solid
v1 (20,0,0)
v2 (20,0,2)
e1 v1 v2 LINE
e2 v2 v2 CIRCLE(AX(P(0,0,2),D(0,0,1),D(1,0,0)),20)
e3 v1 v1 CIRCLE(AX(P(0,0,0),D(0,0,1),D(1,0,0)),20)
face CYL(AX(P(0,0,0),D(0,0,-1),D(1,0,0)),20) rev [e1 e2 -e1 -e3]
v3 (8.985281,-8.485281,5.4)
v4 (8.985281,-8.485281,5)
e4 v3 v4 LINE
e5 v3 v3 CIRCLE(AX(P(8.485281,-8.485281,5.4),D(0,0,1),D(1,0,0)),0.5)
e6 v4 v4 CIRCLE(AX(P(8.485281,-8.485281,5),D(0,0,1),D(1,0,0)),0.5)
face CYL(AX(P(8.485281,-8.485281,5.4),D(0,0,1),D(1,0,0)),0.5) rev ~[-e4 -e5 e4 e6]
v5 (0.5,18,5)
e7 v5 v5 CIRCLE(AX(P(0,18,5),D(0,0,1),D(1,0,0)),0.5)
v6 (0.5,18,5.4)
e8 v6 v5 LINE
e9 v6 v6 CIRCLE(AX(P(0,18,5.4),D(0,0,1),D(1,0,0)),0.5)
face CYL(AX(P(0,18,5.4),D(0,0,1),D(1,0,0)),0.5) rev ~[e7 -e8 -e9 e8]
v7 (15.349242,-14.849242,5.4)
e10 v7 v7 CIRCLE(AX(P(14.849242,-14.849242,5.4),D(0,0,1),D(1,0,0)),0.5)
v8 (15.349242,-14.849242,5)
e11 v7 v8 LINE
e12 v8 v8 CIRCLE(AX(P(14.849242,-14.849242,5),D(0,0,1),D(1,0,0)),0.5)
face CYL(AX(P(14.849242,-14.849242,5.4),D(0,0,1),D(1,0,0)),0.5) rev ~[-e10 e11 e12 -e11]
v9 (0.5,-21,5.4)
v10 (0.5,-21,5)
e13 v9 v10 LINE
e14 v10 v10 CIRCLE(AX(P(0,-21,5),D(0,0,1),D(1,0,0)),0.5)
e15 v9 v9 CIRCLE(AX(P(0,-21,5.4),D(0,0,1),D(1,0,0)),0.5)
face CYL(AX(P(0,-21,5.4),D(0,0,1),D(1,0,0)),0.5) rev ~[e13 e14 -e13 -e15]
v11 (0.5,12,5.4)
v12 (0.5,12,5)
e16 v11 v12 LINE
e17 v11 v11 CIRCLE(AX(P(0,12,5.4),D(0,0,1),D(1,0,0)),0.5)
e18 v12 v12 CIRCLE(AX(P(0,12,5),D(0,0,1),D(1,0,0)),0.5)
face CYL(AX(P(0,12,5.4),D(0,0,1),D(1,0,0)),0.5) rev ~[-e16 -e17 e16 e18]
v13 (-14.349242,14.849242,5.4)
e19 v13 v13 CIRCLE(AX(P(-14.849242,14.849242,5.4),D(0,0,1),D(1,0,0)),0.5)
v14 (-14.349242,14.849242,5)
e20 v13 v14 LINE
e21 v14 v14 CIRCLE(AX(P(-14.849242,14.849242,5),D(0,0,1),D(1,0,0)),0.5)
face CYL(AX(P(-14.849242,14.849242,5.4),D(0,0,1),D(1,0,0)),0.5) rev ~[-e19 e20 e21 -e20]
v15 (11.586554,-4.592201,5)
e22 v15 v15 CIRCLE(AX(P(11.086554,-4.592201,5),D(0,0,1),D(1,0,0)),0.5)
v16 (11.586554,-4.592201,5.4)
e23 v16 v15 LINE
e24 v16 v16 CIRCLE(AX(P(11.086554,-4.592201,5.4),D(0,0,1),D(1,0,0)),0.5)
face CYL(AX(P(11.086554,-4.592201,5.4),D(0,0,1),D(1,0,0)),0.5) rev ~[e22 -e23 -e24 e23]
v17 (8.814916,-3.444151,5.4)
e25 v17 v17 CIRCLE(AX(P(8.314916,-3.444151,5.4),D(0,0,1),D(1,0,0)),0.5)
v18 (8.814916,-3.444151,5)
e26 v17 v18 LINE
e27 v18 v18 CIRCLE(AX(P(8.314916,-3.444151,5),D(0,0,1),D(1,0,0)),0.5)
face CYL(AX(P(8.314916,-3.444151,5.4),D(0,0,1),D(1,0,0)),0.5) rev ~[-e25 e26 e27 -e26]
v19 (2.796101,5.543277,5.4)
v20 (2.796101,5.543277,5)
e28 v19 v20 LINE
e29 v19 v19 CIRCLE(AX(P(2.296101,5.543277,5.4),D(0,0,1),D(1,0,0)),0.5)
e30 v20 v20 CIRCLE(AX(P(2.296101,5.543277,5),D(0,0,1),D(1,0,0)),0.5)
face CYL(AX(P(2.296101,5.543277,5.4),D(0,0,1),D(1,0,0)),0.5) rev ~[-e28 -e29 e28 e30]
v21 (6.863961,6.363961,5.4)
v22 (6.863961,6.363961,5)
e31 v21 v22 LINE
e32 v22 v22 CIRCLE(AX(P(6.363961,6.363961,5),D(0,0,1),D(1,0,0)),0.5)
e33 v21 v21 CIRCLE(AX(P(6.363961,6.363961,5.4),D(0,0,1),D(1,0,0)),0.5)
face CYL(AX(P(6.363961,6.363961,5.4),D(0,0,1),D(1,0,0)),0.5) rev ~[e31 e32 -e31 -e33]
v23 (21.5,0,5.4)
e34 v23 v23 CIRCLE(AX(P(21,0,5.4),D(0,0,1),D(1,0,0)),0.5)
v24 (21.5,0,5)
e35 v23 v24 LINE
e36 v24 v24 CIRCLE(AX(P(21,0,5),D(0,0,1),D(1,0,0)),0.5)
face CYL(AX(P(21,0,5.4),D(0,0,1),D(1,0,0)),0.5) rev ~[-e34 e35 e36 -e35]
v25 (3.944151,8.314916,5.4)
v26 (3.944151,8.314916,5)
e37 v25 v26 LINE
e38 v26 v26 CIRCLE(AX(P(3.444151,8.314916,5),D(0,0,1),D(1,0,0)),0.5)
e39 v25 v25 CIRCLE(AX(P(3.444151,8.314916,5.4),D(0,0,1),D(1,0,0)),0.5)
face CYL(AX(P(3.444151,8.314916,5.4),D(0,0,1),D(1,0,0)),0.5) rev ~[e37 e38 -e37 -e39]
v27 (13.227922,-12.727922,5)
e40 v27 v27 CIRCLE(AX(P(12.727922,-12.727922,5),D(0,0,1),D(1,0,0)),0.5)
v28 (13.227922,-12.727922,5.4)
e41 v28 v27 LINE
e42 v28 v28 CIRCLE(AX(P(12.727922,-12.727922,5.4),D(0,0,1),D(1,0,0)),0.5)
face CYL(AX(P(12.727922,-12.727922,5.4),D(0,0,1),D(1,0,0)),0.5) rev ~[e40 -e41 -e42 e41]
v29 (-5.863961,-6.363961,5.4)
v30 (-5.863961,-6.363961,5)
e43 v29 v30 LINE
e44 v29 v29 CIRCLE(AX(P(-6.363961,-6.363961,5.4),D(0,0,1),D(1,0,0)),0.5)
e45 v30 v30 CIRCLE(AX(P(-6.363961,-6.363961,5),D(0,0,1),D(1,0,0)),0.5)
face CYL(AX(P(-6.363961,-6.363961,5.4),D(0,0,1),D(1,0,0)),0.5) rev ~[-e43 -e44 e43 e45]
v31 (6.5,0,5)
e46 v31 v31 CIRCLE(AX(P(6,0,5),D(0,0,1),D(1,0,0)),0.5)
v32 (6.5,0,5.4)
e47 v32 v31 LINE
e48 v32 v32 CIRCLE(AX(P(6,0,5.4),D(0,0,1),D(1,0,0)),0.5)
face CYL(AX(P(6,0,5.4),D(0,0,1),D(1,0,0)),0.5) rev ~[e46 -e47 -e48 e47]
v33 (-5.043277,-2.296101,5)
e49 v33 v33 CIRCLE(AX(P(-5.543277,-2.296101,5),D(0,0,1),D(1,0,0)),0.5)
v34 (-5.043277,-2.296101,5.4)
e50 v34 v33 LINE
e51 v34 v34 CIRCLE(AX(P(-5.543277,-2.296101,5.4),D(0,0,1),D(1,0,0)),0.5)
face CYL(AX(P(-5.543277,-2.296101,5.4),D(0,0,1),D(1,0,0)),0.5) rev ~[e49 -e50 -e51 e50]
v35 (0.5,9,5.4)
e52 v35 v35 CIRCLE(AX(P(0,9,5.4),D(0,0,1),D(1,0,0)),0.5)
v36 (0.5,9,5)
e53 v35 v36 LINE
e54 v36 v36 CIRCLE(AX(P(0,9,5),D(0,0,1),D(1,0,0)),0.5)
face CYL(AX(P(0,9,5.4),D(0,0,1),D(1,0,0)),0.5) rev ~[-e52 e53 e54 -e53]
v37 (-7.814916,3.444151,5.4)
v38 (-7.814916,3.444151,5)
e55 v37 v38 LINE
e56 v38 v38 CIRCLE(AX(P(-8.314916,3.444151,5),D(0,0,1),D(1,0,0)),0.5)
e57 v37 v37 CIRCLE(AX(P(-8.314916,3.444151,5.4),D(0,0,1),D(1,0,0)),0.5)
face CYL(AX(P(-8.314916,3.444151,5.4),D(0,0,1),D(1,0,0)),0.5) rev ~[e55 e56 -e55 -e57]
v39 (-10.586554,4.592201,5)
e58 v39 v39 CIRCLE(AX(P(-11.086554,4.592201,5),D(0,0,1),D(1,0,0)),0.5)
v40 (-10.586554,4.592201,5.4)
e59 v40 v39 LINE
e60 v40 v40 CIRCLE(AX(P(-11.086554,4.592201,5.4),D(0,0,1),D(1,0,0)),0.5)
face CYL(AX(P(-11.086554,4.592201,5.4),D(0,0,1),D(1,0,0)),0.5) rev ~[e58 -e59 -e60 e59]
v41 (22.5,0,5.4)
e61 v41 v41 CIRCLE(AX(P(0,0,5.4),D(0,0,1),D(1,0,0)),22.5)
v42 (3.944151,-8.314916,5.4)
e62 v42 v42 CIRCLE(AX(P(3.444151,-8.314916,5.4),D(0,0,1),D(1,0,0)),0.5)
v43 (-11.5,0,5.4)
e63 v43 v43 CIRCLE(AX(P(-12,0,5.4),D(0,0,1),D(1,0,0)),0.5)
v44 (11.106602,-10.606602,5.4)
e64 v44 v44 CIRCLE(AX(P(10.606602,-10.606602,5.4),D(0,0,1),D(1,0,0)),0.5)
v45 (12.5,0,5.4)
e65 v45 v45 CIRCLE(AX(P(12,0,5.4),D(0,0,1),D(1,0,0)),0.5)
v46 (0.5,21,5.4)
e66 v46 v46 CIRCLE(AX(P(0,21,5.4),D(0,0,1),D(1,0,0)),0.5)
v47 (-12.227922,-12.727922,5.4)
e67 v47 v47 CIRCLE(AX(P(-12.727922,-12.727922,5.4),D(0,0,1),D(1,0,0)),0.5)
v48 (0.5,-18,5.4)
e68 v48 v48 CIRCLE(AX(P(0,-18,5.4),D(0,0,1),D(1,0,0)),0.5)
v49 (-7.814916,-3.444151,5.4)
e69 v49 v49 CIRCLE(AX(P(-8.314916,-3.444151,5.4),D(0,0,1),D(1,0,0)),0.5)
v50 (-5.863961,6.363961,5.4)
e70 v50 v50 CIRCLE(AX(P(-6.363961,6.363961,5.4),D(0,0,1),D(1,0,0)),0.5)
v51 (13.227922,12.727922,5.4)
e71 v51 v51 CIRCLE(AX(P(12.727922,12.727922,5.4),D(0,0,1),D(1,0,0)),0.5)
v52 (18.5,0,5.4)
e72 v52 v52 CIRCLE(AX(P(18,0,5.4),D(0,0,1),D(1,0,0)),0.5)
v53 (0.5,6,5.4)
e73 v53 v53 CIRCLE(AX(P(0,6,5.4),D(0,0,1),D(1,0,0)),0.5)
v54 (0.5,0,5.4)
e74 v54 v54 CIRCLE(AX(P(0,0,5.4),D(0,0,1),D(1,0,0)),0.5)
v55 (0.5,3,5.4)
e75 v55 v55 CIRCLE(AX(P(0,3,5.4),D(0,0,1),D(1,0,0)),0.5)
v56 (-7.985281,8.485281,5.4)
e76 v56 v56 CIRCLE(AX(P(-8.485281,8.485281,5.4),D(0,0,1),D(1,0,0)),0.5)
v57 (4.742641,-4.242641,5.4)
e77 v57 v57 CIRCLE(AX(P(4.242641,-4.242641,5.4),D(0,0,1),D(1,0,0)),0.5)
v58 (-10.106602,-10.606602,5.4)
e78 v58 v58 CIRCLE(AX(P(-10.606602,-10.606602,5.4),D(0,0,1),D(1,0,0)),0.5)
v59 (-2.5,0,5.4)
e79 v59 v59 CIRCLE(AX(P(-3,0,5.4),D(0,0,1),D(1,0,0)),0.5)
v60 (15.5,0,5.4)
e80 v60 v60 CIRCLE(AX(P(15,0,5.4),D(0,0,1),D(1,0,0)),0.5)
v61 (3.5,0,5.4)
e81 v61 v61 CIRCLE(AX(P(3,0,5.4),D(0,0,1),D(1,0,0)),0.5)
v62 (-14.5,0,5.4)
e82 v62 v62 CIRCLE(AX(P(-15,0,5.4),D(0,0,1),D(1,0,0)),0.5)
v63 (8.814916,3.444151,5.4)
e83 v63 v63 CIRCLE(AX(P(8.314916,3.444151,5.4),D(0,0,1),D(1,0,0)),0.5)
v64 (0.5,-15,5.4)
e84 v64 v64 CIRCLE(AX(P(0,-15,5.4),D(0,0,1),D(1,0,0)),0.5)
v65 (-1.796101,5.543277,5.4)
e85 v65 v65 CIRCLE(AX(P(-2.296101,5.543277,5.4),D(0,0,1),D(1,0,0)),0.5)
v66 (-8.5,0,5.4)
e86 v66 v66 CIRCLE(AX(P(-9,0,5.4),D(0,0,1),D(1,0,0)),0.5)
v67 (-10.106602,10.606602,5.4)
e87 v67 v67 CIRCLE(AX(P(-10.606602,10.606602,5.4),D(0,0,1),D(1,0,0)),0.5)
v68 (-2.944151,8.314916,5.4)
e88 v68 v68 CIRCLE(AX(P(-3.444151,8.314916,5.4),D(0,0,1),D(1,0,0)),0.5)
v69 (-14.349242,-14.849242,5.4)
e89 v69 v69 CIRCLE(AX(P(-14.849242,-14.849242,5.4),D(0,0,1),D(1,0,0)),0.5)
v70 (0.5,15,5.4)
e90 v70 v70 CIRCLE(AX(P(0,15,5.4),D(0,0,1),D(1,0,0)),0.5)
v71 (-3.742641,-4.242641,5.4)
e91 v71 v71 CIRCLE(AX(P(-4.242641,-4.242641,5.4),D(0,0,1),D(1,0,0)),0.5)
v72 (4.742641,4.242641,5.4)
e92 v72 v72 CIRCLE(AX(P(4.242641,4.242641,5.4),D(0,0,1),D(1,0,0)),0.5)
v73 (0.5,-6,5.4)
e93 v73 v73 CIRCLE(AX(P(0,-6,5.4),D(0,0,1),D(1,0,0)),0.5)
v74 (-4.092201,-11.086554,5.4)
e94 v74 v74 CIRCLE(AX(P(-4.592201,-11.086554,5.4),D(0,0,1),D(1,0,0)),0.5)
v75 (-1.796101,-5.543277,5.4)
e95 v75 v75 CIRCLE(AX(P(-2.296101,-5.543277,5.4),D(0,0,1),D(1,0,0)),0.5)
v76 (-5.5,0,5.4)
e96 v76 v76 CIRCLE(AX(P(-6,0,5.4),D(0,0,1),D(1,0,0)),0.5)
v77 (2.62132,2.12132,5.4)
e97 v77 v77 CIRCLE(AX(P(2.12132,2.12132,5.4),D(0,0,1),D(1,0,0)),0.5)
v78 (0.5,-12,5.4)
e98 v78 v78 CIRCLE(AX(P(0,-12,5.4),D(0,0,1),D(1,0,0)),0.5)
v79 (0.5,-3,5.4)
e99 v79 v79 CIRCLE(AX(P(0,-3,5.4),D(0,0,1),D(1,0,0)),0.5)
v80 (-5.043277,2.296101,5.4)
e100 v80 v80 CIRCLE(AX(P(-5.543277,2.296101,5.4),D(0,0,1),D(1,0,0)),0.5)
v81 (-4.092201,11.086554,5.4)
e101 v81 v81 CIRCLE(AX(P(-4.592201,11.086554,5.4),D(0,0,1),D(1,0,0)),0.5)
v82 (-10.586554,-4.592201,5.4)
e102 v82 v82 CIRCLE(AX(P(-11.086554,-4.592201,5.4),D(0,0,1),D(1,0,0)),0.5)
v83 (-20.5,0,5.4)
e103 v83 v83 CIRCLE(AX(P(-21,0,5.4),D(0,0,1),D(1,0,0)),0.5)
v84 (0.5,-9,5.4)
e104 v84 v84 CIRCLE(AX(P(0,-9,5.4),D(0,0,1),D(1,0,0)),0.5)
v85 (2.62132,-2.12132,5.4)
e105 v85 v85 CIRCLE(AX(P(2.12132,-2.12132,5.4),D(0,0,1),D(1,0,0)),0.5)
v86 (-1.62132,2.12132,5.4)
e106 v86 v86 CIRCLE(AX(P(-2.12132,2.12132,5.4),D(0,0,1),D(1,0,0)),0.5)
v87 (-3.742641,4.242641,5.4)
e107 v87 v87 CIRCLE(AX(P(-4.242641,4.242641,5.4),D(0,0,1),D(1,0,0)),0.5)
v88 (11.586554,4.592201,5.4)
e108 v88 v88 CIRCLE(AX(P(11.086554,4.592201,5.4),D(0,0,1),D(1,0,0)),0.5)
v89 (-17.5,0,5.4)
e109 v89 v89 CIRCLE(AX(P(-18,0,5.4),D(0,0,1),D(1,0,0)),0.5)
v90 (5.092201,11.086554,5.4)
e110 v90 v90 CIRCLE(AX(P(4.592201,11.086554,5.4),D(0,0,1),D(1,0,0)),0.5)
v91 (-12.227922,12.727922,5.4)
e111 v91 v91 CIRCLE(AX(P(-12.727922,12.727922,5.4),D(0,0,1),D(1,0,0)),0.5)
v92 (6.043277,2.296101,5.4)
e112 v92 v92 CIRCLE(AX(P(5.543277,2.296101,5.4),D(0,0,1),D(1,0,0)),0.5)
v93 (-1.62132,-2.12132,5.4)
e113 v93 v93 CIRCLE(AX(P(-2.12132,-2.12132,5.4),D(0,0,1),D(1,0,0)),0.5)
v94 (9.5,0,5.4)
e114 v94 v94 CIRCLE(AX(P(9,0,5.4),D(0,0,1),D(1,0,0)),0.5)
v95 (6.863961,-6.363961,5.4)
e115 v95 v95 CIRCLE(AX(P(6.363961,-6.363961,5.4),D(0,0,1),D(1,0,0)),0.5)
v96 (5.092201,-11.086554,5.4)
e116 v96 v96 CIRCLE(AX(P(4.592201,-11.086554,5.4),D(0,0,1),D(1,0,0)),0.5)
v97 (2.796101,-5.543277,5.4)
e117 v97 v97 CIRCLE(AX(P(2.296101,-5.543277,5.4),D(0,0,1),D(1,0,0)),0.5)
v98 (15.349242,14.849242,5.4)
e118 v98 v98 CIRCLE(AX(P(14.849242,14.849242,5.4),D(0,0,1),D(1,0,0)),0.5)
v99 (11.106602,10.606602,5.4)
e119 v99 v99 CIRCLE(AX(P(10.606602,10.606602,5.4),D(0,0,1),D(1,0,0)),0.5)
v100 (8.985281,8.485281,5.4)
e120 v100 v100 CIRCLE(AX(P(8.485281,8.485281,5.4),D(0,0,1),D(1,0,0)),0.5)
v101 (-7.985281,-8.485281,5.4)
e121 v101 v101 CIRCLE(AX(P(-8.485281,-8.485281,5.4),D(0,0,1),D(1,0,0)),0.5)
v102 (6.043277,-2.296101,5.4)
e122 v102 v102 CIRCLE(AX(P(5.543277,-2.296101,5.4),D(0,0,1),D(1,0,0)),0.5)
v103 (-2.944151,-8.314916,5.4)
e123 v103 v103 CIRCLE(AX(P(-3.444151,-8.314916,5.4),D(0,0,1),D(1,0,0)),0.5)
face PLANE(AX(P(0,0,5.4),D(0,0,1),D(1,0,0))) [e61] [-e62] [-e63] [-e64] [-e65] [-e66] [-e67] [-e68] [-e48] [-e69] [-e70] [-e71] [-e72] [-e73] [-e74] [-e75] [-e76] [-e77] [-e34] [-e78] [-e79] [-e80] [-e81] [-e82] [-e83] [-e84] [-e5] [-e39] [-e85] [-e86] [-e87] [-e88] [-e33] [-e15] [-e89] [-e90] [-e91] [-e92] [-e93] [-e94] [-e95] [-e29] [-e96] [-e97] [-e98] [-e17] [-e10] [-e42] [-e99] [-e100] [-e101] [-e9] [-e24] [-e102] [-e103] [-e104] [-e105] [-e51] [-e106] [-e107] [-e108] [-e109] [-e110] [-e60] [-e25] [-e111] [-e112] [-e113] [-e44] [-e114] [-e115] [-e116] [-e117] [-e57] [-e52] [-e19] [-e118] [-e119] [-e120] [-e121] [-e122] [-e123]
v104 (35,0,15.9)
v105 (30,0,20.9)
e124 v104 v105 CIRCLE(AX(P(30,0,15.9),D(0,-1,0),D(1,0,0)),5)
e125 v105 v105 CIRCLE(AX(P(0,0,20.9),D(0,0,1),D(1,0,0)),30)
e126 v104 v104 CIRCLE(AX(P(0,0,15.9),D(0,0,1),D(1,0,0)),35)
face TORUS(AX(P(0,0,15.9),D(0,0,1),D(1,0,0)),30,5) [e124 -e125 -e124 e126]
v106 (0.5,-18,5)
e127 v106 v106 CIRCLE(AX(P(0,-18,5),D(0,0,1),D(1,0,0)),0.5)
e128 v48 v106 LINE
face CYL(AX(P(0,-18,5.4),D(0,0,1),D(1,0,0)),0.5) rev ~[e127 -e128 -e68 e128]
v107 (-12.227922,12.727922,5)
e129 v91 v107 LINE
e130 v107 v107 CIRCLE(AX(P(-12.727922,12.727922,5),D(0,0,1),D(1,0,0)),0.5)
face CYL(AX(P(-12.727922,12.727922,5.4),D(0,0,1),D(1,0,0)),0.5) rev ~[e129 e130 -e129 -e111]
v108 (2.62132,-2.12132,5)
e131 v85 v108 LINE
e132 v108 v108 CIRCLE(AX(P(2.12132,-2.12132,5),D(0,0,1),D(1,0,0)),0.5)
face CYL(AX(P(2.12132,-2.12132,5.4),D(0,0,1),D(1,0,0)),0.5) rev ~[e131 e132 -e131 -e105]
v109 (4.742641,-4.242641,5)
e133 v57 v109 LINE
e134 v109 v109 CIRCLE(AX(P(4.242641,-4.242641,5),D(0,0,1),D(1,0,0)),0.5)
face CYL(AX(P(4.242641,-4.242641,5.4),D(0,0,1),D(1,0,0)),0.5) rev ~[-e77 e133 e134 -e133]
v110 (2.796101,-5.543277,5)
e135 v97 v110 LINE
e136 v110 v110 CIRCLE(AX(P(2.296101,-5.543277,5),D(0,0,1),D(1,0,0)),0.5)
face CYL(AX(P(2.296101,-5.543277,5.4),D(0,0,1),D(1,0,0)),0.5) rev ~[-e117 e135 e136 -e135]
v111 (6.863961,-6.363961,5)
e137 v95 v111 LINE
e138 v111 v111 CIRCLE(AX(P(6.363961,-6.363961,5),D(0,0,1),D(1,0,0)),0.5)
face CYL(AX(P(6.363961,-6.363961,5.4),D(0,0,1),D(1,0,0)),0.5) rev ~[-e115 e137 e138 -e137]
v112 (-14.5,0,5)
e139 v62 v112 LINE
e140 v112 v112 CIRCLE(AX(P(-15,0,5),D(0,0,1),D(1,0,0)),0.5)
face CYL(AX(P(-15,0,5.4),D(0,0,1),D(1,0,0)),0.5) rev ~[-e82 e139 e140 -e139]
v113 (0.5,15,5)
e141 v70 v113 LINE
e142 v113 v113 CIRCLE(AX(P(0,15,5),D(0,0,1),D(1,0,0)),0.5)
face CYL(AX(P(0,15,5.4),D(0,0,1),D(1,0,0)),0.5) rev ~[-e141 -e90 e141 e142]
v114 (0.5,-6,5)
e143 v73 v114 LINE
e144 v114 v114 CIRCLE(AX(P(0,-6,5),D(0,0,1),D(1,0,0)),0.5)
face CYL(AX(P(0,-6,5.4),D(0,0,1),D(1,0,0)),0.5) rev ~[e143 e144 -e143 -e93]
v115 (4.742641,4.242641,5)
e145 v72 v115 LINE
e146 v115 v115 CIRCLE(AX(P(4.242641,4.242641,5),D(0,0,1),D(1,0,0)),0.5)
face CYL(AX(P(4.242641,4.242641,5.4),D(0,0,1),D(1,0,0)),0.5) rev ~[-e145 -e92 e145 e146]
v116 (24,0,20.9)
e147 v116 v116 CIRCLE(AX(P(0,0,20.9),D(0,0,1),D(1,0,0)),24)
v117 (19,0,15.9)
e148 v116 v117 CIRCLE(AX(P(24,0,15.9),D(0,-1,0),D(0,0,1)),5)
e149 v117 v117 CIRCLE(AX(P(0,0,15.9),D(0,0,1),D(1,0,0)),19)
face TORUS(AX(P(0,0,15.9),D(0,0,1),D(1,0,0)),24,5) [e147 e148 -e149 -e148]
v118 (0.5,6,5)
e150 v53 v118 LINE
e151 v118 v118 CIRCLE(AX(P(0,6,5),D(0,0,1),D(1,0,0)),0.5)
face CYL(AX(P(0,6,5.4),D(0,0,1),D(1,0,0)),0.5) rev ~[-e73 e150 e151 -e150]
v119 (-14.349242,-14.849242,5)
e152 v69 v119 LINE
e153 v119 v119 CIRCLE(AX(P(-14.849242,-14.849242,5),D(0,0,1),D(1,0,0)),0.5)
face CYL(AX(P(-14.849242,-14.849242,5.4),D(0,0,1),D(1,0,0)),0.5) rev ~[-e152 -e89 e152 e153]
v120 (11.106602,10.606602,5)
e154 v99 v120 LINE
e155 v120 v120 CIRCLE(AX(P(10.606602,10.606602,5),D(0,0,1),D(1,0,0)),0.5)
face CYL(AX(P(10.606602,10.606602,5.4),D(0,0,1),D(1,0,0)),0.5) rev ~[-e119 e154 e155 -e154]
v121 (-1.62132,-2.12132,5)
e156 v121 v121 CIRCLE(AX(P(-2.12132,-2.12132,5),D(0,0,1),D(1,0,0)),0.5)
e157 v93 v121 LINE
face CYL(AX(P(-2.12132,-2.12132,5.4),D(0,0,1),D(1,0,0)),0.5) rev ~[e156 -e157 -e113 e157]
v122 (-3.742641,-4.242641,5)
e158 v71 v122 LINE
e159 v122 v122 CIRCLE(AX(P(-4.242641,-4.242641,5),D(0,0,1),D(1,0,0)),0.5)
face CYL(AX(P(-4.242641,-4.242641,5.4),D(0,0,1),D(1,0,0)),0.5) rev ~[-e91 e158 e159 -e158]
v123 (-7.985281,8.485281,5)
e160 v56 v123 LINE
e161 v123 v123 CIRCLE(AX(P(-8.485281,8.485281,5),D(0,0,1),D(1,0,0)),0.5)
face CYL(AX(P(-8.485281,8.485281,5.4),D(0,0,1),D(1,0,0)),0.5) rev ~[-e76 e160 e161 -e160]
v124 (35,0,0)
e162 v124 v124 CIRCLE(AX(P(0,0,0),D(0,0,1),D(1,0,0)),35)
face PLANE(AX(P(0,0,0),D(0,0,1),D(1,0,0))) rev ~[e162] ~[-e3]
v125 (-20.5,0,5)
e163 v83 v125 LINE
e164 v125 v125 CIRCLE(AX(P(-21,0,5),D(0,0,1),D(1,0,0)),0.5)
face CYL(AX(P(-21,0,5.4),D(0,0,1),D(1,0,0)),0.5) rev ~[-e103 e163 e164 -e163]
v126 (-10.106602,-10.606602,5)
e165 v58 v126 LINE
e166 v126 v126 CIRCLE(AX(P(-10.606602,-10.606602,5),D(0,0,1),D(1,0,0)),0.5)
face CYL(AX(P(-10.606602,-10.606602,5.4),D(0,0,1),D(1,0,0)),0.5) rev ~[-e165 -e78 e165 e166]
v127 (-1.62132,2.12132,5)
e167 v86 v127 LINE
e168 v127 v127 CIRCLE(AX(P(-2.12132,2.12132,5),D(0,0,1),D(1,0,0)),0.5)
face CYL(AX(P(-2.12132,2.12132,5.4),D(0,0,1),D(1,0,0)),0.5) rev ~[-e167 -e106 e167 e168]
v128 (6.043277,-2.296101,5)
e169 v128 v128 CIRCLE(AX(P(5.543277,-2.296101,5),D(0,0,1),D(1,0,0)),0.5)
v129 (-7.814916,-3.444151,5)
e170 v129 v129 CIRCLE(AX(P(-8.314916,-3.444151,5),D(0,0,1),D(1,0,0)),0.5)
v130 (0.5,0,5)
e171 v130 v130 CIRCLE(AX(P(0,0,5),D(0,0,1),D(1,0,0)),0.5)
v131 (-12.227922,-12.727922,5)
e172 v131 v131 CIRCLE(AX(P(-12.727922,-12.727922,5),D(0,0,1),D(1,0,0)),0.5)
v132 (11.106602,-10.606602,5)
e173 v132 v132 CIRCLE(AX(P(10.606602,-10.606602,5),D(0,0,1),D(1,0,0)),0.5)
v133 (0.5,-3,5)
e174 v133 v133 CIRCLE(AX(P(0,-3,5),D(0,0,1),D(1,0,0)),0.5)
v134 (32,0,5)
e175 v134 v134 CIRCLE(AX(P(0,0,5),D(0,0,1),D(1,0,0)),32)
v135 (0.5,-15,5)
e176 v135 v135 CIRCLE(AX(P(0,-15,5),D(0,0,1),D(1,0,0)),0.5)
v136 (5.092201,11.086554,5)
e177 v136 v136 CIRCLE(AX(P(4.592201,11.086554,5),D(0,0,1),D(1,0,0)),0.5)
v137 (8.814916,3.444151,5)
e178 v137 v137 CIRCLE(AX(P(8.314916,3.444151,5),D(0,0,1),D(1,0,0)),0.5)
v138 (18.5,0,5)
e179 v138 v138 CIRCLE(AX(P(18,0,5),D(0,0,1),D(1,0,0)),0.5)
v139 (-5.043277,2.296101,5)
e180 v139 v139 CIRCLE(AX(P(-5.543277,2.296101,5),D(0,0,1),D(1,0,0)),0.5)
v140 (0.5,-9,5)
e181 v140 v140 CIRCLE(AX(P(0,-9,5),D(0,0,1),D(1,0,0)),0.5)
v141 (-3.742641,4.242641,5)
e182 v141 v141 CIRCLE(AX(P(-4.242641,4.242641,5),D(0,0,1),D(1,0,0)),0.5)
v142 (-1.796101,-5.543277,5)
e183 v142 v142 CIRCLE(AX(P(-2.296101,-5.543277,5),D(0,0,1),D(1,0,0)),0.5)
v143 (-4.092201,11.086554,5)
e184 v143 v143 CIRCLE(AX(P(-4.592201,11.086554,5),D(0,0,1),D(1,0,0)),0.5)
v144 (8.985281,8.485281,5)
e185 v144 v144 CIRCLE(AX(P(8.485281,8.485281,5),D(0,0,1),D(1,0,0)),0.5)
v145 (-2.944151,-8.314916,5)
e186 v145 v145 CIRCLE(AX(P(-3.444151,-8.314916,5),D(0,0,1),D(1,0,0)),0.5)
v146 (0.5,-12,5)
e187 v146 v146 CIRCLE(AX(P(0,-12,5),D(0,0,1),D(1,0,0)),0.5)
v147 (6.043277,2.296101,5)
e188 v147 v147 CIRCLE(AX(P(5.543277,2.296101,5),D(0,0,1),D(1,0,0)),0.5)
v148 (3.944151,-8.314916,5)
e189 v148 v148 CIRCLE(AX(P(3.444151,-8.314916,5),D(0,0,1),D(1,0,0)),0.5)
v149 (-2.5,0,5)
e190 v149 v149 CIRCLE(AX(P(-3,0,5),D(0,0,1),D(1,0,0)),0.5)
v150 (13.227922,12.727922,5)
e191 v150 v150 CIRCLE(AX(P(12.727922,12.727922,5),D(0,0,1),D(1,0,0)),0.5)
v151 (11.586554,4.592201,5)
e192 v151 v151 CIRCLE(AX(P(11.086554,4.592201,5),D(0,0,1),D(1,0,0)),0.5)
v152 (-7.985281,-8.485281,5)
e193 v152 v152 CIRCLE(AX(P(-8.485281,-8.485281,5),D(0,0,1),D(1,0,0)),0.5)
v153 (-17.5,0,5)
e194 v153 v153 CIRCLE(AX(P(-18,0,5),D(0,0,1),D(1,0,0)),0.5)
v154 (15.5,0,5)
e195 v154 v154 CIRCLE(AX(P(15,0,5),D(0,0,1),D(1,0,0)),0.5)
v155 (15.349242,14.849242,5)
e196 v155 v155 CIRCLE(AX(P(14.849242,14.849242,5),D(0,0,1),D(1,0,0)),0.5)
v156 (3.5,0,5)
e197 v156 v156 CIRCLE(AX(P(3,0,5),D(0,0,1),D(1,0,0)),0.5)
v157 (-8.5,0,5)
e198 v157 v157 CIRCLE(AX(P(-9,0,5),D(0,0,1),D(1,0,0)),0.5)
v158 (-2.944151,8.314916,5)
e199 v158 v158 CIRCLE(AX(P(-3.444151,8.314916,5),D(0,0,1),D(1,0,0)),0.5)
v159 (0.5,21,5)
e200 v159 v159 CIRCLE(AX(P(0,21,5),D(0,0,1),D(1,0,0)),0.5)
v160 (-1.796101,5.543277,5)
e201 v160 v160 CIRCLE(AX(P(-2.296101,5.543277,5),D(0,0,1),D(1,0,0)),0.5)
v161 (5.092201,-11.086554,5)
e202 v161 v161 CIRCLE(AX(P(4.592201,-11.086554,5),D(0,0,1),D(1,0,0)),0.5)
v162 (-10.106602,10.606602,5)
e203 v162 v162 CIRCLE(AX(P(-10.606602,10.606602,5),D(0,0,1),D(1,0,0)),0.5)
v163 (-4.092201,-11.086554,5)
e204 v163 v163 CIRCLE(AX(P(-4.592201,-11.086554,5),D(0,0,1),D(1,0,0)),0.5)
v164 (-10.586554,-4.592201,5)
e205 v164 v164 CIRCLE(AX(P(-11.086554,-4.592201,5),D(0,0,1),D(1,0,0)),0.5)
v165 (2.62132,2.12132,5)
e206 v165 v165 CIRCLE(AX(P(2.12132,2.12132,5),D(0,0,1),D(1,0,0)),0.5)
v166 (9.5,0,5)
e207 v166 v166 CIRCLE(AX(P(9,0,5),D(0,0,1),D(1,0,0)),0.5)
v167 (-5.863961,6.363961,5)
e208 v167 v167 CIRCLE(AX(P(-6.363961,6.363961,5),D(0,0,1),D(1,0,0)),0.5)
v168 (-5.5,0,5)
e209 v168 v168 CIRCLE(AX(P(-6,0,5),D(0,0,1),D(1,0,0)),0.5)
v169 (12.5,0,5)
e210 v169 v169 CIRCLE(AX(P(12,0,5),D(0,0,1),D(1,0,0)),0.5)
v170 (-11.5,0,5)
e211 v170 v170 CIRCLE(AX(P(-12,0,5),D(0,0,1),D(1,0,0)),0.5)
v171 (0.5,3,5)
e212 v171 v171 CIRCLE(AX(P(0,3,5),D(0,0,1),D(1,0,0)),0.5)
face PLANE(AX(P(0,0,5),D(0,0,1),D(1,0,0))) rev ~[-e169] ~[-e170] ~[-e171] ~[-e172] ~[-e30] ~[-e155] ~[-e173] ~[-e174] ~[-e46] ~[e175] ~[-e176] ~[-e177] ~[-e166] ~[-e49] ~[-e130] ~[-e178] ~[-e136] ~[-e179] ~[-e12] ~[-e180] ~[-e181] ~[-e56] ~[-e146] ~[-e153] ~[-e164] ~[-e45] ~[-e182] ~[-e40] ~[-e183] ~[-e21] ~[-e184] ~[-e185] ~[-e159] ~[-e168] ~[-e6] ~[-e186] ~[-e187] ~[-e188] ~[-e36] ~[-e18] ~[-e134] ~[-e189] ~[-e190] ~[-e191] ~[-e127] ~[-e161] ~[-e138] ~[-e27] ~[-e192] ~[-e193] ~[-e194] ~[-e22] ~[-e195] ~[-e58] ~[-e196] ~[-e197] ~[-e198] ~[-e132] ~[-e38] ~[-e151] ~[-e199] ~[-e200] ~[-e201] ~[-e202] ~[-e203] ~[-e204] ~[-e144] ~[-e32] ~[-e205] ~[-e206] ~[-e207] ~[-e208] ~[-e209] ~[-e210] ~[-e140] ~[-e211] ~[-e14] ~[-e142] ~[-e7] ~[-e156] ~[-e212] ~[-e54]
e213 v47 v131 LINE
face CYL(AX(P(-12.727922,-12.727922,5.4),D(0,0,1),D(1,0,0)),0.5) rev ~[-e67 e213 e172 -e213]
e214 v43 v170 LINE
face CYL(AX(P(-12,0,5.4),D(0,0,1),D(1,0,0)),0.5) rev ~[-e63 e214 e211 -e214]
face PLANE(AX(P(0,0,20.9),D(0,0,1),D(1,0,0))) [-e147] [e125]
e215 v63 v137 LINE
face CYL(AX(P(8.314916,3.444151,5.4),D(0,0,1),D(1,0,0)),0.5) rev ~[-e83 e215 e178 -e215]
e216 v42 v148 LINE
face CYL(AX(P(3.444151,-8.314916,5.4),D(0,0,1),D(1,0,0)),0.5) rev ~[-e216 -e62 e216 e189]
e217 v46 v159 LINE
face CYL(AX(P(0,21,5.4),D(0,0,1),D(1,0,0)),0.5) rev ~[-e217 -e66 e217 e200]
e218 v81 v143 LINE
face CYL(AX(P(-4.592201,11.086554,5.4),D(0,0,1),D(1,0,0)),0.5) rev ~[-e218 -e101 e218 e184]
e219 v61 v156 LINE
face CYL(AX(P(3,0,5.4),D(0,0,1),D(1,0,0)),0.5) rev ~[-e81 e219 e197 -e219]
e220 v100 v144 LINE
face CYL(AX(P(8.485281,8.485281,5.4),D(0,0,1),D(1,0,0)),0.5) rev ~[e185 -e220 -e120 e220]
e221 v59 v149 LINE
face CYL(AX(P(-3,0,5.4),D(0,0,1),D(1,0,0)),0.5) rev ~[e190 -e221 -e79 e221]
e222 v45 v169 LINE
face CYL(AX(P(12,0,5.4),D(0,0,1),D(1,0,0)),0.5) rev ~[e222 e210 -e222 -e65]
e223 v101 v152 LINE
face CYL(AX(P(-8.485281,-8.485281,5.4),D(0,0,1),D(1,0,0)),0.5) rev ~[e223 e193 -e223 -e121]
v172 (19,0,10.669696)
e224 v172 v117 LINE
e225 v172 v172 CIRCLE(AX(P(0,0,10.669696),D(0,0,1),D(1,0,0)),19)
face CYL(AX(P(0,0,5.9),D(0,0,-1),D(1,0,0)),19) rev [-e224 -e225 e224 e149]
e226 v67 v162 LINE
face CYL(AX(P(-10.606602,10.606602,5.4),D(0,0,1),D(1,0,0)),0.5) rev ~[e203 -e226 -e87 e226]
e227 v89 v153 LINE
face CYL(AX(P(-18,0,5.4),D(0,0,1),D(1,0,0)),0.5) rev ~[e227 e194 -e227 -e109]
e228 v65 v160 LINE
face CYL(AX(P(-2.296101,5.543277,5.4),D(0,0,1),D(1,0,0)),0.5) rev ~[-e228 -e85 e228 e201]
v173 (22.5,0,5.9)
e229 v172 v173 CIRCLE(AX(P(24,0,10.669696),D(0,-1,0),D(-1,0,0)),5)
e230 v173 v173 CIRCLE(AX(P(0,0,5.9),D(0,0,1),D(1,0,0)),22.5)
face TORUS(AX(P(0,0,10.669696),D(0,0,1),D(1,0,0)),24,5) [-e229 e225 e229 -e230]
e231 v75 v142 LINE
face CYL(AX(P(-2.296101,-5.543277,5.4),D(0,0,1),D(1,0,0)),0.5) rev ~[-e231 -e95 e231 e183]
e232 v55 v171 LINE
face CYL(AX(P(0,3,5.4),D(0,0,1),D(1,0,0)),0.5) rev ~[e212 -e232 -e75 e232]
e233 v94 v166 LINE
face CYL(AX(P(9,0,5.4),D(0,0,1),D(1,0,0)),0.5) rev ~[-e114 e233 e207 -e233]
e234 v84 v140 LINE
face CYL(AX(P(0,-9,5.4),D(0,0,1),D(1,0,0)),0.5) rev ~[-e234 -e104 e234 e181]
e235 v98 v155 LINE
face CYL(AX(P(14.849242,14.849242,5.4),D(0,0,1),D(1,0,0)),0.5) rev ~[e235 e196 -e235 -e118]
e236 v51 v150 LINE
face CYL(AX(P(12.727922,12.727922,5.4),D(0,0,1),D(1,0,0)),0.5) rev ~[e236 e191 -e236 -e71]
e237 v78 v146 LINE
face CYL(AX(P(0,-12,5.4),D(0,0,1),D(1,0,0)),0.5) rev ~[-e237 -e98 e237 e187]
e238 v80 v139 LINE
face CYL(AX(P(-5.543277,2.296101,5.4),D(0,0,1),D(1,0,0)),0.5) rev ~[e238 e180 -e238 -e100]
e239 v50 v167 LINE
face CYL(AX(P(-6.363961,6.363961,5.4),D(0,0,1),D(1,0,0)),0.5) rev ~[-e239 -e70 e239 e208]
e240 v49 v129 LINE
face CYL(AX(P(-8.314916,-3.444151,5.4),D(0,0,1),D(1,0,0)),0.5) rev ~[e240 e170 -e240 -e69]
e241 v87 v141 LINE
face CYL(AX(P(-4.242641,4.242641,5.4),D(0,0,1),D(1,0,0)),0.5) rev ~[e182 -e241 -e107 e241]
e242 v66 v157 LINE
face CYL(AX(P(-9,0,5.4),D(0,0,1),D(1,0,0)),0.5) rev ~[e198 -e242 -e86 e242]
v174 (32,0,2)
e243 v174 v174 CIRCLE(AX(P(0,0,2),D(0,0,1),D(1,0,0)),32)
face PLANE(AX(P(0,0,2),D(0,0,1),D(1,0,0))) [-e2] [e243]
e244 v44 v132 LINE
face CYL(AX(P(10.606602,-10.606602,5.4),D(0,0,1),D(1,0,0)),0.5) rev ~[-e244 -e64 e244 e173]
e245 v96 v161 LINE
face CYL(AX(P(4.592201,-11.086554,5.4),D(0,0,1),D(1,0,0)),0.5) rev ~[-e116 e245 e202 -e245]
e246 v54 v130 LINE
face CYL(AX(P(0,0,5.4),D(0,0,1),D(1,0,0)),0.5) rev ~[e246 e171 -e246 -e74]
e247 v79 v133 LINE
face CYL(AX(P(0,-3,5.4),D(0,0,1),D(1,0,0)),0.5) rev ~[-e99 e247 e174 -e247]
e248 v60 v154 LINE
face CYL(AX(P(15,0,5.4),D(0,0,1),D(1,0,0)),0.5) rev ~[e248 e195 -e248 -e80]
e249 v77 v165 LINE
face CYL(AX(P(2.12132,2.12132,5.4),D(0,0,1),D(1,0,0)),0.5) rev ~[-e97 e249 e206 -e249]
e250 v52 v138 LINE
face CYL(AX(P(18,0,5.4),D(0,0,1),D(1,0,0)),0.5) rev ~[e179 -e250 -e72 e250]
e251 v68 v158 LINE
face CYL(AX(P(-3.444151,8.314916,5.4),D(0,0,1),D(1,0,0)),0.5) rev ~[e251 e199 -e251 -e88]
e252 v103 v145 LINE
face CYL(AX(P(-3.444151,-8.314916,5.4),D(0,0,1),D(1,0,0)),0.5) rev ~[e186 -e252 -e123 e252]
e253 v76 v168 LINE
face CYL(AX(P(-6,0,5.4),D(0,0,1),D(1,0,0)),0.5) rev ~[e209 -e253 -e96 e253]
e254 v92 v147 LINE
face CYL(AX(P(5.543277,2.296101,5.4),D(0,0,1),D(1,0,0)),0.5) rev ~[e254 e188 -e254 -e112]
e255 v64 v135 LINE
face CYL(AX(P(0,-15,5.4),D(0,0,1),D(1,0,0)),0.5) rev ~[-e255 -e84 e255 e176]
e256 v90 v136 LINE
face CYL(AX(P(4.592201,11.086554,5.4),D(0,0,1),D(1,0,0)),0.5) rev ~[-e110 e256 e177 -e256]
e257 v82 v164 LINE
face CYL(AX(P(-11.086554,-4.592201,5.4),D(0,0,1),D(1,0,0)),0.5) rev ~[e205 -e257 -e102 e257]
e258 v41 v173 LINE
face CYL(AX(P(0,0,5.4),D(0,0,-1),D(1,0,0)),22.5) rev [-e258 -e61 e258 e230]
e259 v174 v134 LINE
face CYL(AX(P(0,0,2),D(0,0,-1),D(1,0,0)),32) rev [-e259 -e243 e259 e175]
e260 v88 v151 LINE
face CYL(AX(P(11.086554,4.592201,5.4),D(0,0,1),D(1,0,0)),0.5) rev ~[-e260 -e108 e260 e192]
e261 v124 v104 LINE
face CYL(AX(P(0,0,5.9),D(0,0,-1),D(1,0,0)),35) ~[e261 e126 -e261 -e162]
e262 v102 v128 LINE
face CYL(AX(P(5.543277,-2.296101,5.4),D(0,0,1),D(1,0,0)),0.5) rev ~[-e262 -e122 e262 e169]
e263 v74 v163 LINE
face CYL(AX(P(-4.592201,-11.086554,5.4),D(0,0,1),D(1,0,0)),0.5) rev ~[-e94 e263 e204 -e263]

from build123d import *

# Parameters (mm, degrees)
F0_R      = 35
F0_R_2    = 20
F1_DEPTH  = 2
F2_R      = 35
F2_R_2    = 32
F3_DEPTH  = 3
F4_R      = 35
F5_DEPTH  = 0.4
F6_R      = 0.5
F7_DEPTH  = 1
F8_R      = 35
F8_R_2    = 22.5
F9_DEPTH  = 0.5
F10_R     = 35
F10_R_2   = 22.5
F10_R_3   = 19
F11_DEPTH = 15


# Not quite as in the source:
# - a fillet or chamfer that OpenCascade refuses, or shapes differently, is made with other operations: its cross-section is extruded or revolved along the edge and cut away or added


with BuildPart() as f1:
    # F0 (on Top) → F1 (new body)
    with BuildSketch(Plane.XY):
        Circle(F0_R)
        Circle(F0_R_2, mode=Mode.SUBTRACT)
    extrude(amount=F1_DEPTH)

    # F2 (on face) → F3 (join)
    with BuildSketch(Plane.XY.offset(2)):
        Circle(F2_R)
        Circle(F2_R_2, mode=Mode.SUBTRACT)
    extrude(amount=F3_DEPTH)

    # F4 (on face) → F5 (join)
    with BuildSketch(Plane.XY.offset(5)):
        Circle(F4_R)
    extrude(amount=F5_DEPTH)

    # F6 (on face) → F7 (cut)
    with BuildSketch(Plane.XY.offset(5.4)):
        Circle(F6_R)
        with Locations((3, 0)):
            Circle(F6_R)
        with Locations((6, 0)):
            Circle(F6_R)
        with Locations((9, 0)):
            Circle(F6_R)
        with Locations((12, 0)):
            Circle(F6_R)
        with Locations((15, 0)):
            Circle(F6_R)
        with Locations((18, 0)):
            Circle(F6_R)
        with Locations((21, 0)):
            Circle(F6_R)
        with Locations((2.1213203436, 2.1213203436)):
            Circle(F6_R)
        with Locations((4.2426406871, 4.2426406871)):
            Circle(F6_R)
        with Locations((6.3639610307, 6.3639610307)):
            Circle(F6_R)
        with Locations((8.4852813742, 8.4852813742)):
            Circle(F6_R)
        with Locations((10.6066017178, 10.6066017178)):
            Circle(F6_R)
        with Locations((12.7279220614, 12.7279220614)):
            Circle(F6_R)
        with Locations((14.8492424049, 14.8492424049)):
            Circle(F6_R)
        with Locations((0, 3)):
            Circle(F6_R)
        with Locations((0, 6)):
            Circle(F6_R)
        with Locations((0, 9)):
            Circle(F6_R)
        with Locations((0, 12)):
            Circle(F6_R)
        with Locations((0, 15)):
            Circle(F6_R)
        with Locations((0, 18)):
            Circle(F6_R)
        with Locations((0, 21)):
            Circle(F6_R)
        with Locations((-2.1213203436, 2.1213203436)):
            Circle(F6_R)
        with Locations((-4.2426406871, 4.2426406871)):
            Circle(F6_R)
        with Locations((-6.3639610307, 6.3639610307)):
            Circle(F6_R)
        with Locations((-8.4852813742, 8.4852813742)):
            Circle(F6_R)
        with Locations((-10.6066017178, 10.6066017178)):
            Circle(F6_R)
        with Locations((-12.7279220614, 12.7279220614)):
            Circle(F6_R)
        with Locations((-14.8492424049, 14.8492424049)):
            Circle(F6_R)
        with Locations((-3, 0)):
            Circle(F6_R)
        with Locations((-6, 0)):
            Circle(F6_R)
        with Locations((-9, 0)):
            Circle(F6_R)
        with Locations((-12, 0)):
            Circle(F6_R)
        with Locations((-15, 0)):
            Circle(F6_R)
        with Locations((-18, 0)):
            Circle(F6_R)
        with Locations((-21, 0)):
            Circle(F6_R)
        with Locations((-2.1213203436, -2.1213203436)):
            Circle(F6_R)
        with Locations((-4.2426406871, -4.2426406871)):
            Circle(F6_R)
        with Locations((-6.3639610307, -6.3639610307)):
            Circle(F6_R)
        with Locations((-8.4852813742, -8.4852813742)):
            Circle(F6_R)
        with Locations((-10.6066017178, -10.6066017178)):
            Circle(F6_R)
        with Locations((-12.7279220614, -12.7279220614)):
            Circle(F6_R)
        with Locations((-14.8492424049, -14.8492424049)):
            Circle(F6_R)
        with Locations((0, -3)):
            Circle(F6_R)
        with Locations((0, -6)):
            Circle(F6_R)
        with Locations((0, -9)):
            Circle(F6_R)
        with Locations((0, -12)):
            Circle(F6_R)
        with Locations((0, -15)):
            Circle(F6_R)
        with Locations((0, -18)):
            Circle(F6_R)
        with Locations((0, -21)):
            Circle(F6_R)
        with Locations((2.1213203436, -2.1213203436)):
            Circle(F6_R)
        with Locations((4.2426406871, -4.2426406871)):
            Circle(F6_R)
        with Locations((6.3639610307, -6.3639610307)):
            Circle(F6_R)
        with Locations((8.4852813742, -8.4852813742)):
            Circle(F6_R)
        with Locations((10.6066017178, -10.6066017178)):
            Circle(F6_R)
        with Locations((12.7279220614, -12.7279220614)):
            Circle(F6_R)
        with Locations((14.8492424049, -14.8492424049)):
            Circle(F6_R)
        with Locations((5.5432771951, 2.2961005942)):
            Circle(F6_R)
        with Locations((8.3149157926, 3.4441508913)):
            Circle(F6_R)
        with Locations((11.0865543901, 4.5922011884)):
            Circle(F6_R)
        with Locations((2.2961005942, 5.5432771951)):
            Circle(F6_R)
        with Locations((3.4441508913, 8.3149157926)):
            Circle(F6_R)
        with Locations((4.5922011884, 11.0865543901)):
            Circle(F6_R)
        with Locations((-2.2961005942, 5.5432771951)):
            Circle(F6_R)
        with Locations((-3.4441508913, 8.3149157926)):
            Circle(F6_R)
        with Locations((-4.5922011884, 11.0865543901)):
            Circle(F6_R)
        with Locations((-5.5432771951, 2.2961005942)):
            Circle(F6_R)
        with Locations((-8.3149157926, 3.4441508913)):
            Circle(F6_R)
        with Locations((-11.0865543901, 4.5922011884)):
            Circle(F6_R)
        with Locations((-5.5432771951, -2.2961005942)):
            Circle(F6_R)
        with Locations((-8.3149157926, -3.4441508913)):
            Circle(F6_R)
        with Locations((-11.0865543901, -4.5922011884)):
            Circle(F6_R)
        with Locations((-2.2961005942, -5.5432771951)):
            Circle(F6_R)
        with Locations((-3.4441508913, -8.3149157926)):
            Circle(F6_R)
        with Locations((-4.5922011884, -11.0865543901)):
            Circle(F6_R)
        with Locations((2.2961005942, -5.5432771951)):
            Circle(F6_R)
        with Locations((3.4441508913, -8.3149157926)):
            Circle(F6_R)
        with Locations((4.5922011884, -11.0865543901)):
            Circle(F6_R)
        with Locations((5.5432771951, -2.2961005942)):
            Circle(F6_R)
        with Locations((8.3149157926, -3.4441508913)):
            Circle(F6_R)
        with Locations((11.0865543901, -4.5922011884)):
            Circle(F6_R)
    extrude(amount=-F7_DEPTH, mode=Mode.SUBTRACT)

    # F8 (on face) → F9 (join)
    with BuildSketch(Plane.XY.offset(5.4)):
        Circle(F8_R)
        Circle(F8_R_2, mode=Mode.SUBTRACT)
    extrude(amount=F9_DEPTH)

    # F10 (on face) → F11 (join)
    with BuildSketch(Plane.XY.offset(5.9)):
        Circle(F10_R)
        Circle(F10_R_2, mode=Mode.SUBTRACT)
        Circle(F10_R_2)
        Circle(F10_R_3, mode=Mode.SUBTRACT)
    extrude(amount=F11_DEPTH)

    # F12: fillet of radius 5 on 4 edges, made by hand

    # F12_s1 → F12_t2 (revolve, cut)
    with BuildSketch(Plane.XZ):
        with BuildLine():
            ThreePointArc((24, 20.9), (20.4644660941, 19.4355339059), (19, 15.9))
            Line((19, 15.9), (19, 20.9))
            Line((19, 20.9), (24, 20.9))
        make_face()
    revolve(axis=Axis((0, 0, 20.9), (0, 0, 1)), mode=Mode.SUBTRACT)

    # F12_s3 → F12_t4 (revolve, cut)
    with BuildSketch(Plane.XZ):
        with BuildLine():
            ThreePointArc((35, 15.9), (33.5355339059, 19.4355339059), (30, 20.9))
            Line((30, 20.9), (35, 20.9))
            Line((35, 20.9), (35, 15.9))
        make_face()
    revolve(axis=Axis((0, 0, 20.9), (0, 0, 1)), mode=Mode.SUBTRACT)

    # F12_s5 → F12_t6 (revolve, cut)
    with BuildSketch(Plane.XZ):
        with BuildLine():
            ThreePointArc((19, 10.6696960071), (19.9688711259, 7.7116561155), (22.5, 5.9))
            Line((22.5, 5.9), (19, 5.9))
            Line((19, 5.9), (19, 10.6696960071))
        make_face()
    revolve(axis=Axis((0, 0, 5.9), (0, 0, 1)), mode=Mode.SUBTRACT)


solid = f1.part
